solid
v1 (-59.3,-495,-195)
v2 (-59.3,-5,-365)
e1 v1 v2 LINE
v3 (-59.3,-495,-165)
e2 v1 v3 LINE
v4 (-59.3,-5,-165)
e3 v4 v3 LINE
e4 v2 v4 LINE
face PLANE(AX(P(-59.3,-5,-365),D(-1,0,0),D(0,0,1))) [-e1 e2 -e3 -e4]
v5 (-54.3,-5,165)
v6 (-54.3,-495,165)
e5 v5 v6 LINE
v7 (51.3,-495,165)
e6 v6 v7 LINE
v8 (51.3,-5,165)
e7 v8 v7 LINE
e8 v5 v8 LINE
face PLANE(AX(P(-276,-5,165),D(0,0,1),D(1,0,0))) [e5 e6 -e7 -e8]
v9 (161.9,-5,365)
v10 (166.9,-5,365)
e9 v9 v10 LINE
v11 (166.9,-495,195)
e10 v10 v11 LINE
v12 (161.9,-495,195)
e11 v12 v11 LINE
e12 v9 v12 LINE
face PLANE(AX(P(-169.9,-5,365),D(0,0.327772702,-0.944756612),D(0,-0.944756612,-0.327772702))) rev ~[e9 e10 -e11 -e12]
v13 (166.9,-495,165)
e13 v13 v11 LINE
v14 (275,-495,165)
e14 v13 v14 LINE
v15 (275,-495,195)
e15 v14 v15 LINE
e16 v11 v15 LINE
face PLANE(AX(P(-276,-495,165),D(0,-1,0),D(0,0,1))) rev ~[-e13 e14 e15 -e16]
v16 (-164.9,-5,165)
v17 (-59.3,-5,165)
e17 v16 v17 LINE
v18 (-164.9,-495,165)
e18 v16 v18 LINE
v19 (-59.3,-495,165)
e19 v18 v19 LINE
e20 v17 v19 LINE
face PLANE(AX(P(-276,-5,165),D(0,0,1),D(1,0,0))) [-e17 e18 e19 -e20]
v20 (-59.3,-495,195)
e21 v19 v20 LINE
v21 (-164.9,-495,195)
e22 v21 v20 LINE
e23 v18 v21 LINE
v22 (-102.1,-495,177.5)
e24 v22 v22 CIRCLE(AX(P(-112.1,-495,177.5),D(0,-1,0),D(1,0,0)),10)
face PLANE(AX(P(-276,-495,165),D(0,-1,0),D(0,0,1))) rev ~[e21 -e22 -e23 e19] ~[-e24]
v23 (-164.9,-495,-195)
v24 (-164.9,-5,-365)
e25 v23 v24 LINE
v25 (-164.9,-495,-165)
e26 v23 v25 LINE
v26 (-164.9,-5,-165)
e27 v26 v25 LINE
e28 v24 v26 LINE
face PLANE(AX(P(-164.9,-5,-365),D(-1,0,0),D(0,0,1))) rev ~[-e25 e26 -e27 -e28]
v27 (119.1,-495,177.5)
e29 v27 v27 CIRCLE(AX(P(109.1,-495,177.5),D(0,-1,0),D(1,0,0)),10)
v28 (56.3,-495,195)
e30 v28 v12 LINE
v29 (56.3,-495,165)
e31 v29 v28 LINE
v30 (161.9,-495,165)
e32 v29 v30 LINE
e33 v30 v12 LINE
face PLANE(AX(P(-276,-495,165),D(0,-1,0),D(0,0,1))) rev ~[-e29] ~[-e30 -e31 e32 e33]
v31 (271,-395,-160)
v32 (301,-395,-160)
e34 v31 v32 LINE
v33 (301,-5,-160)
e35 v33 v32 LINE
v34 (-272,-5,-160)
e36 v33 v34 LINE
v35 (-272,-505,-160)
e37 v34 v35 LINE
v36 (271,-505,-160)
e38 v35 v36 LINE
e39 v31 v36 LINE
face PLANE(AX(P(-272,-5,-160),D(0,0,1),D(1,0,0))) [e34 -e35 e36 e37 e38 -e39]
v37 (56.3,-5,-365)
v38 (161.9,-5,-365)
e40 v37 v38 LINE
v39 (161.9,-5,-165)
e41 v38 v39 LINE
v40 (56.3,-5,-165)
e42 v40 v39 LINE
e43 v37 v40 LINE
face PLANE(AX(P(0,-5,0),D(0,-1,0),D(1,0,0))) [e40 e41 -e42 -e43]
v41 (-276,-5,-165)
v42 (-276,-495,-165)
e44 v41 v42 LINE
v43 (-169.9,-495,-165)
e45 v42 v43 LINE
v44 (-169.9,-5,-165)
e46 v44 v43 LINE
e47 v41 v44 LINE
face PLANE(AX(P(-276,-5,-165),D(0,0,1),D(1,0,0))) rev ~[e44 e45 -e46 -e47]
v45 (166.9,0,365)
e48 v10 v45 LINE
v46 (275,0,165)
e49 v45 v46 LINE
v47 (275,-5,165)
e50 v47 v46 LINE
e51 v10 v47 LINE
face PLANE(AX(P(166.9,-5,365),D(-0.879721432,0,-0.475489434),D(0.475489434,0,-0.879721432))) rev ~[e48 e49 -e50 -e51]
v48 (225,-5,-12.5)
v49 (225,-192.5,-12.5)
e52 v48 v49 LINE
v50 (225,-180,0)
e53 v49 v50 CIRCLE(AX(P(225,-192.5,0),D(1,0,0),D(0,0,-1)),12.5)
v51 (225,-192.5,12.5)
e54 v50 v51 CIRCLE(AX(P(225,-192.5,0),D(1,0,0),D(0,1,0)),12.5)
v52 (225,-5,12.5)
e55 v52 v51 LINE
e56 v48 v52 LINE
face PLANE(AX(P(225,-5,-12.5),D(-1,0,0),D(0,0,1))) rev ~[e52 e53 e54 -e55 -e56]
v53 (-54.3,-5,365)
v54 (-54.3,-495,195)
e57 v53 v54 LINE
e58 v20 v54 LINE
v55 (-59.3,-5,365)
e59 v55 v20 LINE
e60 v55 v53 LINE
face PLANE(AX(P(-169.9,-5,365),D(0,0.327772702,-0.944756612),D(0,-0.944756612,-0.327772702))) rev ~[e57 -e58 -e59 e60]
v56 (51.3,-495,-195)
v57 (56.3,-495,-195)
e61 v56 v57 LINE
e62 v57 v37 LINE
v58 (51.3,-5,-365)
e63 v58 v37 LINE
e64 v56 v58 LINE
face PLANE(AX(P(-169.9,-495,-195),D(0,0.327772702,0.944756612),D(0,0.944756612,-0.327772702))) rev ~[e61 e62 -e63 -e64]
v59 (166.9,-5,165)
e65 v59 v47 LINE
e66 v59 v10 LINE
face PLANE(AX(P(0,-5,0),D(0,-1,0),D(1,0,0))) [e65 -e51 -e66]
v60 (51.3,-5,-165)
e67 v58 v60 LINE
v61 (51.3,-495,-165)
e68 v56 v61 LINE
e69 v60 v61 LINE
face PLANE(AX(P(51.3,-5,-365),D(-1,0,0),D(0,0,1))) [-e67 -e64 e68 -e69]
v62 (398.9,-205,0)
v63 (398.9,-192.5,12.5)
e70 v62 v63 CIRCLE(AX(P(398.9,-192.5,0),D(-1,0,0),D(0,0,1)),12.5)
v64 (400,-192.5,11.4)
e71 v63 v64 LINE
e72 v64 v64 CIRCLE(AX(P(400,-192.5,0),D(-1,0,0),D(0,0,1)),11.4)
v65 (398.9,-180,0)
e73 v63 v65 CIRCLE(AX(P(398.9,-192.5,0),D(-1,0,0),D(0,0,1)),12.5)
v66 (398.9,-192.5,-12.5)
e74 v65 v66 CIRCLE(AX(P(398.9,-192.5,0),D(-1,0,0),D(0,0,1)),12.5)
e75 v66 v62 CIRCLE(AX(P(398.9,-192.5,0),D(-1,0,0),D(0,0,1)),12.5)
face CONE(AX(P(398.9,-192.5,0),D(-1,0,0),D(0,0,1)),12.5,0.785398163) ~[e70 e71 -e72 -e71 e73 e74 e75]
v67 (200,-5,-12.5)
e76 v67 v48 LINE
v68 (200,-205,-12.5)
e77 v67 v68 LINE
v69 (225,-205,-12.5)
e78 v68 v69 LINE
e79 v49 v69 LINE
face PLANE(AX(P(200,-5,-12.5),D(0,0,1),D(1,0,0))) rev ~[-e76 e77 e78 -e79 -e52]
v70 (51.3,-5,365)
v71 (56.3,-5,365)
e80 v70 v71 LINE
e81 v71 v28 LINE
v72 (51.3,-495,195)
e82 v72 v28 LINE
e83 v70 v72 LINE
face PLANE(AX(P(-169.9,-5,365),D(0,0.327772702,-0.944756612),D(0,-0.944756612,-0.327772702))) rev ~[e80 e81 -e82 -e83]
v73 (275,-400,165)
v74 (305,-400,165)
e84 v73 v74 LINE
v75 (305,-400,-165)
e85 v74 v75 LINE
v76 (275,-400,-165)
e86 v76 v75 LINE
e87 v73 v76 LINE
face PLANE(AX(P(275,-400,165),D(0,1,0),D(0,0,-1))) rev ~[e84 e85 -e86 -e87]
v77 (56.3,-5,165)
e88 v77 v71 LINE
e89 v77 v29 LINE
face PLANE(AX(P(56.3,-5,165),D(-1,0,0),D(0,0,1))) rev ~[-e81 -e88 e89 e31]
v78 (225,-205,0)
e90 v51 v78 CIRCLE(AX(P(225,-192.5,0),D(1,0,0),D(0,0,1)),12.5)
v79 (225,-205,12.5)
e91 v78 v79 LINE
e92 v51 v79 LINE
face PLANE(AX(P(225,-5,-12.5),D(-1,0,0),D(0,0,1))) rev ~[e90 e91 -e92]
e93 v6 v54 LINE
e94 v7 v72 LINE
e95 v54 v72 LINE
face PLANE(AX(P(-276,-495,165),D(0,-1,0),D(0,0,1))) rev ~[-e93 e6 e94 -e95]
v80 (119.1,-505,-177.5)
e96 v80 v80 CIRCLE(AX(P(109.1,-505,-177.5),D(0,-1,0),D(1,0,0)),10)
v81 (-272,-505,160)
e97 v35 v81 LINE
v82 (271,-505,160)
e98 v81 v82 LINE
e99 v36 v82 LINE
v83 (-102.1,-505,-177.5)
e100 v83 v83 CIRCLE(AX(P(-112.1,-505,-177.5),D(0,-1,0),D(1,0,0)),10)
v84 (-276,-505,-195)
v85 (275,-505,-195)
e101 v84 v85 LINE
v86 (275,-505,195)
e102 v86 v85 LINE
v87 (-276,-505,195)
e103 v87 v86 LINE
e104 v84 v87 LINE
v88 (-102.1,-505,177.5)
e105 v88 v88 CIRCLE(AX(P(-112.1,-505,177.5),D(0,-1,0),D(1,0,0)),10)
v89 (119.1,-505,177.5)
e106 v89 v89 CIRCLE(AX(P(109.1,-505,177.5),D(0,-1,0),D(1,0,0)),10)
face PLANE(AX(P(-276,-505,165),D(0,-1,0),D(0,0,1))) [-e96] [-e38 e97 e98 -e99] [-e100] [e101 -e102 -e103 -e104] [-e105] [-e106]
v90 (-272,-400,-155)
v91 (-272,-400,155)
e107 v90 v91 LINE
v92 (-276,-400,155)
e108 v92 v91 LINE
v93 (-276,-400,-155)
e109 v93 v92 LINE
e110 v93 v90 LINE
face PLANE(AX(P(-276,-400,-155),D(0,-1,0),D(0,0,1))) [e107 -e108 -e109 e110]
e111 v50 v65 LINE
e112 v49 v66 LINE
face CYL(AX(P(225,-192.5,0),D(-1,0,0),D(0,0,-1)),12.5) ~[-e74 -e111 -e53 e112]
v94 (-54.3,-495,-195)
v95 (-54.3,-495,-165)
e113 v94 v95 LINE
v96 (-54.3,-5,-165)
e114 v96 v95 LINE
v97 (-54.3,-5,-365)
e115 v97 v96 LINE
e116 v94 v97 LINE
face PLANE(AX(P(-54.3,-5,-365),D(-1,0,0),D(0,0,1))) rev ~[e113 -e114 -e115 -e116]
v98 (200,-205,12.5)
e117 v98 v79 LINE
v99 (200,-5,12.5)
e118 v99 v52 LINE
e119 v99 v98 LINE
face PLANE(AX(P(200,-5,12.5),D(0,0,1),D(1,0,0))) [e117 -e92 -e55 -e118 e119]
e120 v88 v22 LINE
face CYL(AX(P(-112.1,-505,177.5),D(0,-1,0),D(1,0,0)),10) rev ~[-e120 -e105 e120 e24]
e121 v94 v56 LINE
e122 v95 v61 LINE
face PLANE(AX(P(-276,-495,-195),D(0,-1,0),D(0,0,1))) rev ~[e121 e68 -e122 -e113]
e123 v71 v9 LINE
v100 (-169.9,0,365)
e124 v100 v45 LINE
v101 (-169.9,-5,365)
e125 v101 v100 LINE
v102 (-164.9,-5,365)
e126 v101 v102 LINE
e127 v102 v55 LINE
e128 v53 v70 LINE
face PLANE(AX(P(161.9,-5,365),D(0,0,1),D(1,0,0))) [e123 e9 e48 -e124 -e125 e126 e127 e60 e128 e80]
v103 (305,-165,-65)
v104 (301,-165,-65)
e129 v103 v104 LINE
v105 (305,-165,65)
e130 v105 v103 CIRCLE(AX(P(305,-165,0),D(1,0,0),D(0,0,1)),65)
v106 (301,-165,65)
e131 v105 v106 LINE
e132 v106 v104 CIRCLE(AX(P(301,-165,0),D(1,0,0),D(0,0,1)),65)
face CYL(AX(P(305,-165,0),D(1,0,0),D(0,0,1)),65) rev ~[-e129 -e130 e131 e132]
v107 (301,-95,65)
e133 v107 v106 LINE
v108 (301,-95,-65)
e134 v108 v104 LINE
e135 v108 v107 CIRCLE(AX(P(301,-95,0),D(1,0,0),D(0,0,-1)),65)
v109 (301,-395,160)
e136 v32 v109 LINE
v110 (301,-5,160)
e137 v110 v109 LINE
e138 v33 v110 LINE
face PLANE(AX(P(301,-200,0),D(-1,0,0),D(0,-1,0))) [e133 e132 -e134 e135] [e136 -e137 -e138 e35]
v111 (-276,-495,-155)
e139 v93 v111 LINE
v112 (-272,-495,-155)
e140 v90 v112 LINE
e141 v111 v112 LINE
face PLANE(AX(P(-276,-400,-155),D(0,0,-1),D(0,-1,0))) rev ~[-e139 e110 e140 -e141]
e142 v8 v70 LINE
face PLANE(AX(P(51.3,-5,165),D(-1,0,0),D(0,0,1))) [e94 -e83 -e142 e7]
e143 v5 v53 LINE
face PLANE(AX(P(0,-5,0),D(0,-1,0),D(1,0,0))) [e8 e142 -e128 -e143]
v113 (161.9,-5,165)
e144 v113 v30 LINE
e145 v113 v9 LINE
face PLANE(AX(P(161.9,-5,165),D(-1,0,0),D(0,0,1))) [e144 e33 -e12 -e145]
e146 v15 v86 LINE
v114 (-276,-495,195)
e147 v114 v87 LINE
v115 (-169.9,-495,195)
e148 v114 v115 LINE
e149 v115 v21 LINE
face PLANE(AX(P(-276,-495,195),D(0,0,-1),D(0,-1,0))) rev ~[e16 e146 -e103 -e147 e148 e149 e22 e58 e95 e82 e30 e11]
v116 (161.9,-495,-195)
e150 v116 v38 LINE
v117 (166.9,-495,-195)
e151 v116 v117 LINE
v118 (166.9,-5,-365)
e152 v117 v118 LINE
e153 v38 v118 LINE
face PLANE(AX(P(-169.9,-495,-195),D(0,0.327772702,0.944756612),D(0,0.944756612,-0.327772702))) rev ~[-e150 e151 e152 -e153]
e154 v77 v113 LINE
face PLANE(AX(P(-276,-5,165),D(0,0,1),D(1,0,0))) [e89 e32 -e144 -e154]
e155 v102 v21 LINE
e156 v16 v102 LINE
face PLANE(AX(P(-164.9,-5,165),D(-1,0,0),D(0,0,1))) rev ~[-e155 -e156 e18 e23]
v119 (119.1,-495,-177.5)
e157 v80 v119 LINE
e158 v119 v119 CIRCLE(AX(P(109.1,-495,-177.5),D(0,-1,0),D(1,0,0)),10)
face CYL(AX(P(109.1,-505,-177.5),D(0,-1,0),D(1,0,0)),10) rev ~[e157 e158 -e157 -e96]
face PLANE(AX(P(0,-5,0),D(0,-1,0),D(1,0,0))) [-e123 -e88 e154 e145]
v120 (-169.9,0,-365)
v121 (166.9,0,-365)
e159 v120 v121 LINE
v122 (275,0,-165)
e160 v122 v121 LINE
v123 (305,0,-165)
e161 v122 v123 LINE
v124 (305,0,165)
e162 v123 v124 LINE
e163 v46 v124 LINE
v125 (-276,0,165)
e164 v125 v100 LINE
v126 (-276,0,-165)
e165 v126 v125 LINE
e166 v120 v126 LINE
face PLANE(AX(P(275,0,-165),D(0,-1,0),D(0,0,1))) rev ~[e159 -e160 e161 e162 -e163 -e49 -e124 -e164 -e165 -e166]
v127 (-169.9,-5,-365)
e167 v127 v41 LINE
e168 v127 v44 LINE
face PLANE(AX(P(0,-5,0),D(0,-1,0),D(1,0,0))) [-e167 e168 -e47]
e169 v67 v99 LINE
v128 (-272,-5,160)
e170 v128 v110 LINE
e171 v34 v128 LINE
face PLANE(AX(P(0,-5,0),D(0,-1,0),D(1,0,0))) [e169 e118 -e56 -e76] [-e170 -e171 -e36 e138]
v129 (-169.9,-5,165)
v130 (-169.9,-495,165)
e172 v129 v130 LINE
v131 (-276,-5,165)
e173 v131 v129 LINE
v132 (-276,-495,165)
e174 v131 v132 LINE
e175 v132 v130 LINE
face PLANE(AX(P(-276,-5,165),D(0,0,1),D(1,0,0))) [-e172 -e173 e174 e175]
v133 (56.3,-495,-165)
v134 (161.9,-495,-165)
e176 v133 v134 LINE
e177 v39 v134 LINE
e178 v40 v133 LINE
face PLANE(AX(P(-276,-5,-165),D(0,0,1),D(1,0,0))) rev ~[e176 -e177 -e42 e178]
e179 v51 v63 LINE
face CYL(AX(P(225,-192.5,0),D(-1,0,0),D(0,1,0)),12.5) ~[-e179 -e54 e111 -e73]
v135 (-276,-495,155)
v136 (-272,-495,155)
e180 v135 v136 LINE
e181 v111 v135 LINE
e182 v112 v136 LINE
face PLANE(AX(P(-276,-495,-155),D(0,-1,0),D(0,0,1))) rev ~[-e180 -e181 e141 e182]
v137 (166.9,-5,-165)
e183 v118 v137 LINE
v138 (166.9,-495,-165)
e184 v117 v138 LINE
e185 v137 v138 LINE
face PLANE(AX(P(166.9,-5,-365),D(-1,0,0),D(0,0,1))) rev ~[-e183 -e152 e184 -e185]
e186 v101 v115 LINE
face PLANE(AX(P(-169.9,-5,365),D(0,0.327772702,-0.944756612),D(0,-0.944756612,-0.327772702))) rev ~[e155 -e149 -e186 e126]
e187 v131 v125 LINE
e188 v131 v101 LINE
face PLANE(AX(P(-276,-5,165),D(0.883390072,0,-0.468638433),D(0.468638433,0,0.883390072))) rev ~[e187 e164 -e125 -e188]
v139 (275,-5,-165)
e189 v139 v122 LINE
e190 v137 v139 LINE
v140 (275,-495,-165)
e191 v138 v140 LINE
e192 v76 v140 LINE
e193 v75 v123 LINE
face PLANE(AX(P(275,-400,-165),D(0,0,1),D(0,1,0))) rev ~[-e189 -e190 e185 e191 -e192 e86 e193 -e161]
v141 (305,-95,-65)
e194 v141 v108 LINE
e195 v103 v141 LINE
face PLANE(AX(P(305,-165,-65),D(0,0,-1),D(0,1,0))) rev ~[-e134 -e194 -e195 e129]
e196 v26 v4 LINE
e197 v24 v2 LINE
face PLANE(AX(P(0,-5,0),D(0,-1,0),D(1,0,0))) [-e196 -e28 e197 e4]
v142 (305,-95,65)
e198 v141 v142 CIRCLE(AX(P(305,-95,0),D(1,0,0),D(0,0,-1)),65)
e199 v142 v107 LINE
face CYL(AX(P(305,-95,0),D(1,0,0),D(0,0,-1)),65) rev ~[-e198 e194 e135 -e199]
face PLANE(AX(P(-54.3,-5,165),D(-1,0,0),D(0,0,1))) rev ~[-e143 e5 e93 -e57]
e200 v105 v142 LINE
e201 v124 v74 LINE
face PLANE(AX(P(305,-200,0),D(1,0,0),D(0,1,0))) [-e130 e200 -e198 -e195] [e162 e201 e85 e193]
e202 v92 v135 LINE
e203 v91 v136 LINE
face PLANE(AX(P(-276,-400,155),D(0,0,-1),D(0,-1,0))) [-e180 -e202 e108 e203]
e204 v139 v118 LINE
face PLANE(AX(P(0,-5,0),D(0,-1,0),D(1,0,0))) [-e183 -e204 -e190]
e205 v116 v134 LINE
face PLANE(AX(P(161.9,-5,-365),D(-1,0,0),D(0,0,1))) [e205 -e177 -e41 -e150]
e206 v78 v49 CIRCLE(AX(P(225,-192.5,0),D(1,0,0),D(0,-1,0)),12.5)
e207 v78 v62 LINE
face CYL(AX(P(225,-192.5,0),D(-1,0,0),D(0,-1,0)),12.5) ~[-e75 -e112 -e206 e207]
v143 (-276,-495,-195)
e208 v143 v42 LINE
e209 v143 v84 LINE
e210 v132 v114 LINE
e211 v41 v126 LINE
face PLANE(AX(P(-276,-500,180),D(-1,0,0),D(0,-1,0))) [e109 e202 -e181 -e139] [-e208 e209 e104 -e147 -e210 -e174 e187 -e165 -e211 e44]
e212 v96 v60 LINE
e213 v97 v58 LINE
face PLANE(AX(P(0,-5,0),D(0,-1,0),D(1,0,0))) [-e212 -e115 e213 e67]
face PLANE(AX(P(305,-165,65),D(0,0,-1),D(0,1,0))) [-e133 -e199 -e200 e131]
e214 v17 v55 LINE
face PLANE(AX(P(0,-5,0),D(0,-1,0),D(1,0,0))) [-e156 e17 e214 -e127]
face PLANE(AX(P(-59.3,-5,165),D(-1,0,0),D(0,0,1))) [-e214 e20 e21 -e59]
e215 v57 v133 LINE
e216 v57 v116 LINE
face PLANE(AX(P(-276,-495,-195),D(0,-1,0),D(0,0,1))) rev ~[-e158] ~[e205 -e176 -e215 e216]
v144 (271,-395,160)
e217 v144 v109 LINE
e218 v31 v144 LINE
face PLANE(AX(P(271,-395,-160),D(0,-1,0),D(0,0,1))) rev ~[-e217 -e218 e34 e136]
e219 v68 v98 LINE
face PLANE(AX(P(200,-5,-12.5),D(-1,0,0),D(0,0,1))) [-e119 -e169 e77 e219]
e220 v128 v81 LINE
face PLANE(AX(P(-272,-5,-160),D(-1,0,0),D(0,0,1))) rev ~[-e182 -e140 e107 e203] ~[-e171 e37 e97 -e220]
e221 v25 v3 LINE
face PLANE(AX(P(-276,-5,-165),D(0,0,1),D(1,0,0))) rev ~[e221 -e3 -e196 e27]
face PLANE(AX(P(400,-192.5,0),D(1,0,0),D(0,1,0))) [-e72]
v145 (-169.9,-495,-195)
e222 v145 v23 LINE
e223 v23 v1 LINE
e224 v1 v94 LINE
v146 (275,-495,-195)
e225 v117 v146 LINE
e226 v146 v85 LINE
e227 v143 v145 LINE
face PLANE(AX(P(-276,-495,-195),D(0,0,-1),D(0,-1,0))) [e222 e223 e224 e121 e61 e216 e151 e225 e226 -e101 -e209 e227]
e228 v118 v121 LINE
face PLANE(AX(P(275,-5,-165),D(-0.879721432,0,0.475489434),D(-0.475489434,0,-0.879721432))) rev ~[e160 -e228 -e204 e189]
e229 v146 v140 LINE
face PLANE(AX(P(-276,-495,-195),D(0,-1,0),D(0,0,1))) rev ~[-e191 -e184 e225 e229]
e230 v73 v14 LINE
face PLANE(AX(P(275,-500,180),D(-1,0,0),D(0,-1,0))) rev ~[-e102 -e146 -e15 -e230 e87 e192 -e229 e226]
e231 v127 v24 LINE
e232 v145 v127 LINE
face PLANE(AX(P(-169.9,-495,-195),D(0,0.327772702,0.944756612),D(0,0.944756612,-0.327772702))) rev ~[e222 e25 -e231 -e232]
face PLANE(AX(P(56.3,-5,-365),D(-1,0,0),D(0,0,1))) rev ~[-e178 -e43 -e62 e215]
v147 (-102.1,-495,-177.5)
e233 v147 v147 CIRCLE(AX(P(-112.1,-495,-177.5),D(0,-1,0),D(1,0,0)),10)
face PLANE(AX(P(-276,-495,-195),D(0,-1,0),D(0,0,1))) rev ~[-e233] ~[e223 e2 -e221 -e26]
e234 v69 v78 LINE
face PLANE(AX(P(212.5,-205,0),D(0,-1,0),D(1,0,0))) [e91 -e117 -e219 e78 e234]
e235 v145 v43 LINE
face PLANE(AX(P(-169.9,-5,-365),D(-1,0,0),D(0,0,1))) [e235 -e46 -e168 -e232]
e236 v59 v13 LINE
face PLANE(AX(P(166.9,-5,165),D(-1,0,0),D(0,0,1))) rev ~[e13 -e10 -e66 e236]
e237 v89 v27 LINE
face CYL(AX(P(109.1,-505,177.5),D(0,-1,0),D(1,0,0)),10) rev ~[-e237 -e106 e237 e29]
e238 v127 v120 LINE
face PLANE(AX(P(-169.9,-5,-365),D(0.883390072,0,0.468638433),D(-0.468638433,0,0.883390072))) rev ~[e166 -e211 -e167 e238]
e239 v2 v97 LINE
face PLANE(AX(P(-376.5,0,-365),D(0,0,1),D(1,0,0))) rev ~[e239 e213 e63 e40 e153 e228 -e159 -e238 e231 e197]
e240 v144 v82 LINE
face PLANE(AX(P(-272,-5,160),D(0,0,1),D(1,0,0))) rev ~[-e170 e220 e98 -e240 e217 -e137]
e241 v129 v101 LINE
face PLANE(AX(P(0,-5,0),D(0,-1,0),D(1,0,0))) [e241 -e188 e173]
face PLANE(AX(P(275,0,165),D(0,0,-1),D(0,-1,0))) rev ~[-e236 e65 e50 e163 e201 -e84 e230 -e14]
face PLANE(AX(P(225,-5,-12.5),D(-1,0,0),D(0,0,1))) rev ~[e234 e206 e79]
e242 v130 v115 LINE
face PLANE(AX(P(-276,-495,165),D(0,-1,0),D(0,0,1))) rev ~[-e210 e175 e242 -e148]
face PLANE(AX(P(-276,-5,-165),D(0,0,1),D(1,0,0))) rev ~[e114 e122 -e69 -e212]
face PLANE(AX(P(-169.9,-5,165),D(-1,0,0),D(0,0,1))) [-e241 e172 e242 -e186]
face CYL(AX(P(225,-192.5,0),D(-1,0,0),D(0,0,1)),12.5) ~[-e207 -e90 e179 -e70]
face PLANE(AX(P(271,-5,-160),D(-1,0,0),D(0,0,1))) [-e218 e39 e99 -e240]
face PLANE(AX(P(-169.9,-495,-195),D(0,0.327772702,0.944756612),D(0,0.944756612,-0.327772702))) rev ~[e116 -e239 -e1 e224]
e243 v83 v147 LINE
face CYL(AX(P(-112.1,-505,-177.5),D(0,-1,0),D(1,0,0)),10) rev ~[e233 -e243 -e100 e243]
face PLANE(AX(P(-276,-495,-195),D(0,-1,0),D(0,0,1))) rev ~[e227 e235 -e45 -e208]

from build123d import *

# Parameters (mm, degrees)
F0_W      = 753
F0_H      = 730
F1_DEPTH  = 5
F2_W      = 551
F2_H      = 330
F2_W_2    = 543
F2_H_2    = 320
F3_DEPTH  = 500
F4_W      = 10
F4_H      = 30
F5_DEPTH  = 551
F6_W      = 5
F6_H      = 200
F7_DEPTH  = 490
F10_DEPTH = 546.401
F13_DEPTH = 5.001
F15_DEPTH = 30
F16_W     = 390
F16_H     = 320
F17_DEPTH = 30
F18_W     = 70
F18_H     = 130
F19_DEPTH = 5
F20_W     = 95
F20_H     = 310
F21_DEPTH = 5
F22_W     = 25
F22_H     = 25
F23_DEPTH = 200
F25_DEPTH = 175
F27_R     = 10
F28_DEPTH = 25


# Not quite as in the source:
# - a fillet or chamfer that OpenCascade refuses, or shapes differently, is made with other operations: its cross-section is extruded or revolved along the edge and cut away or added


with BuildPart() as f1:
    # F0 (on Front) → F1 (new body)
    with BuildSketch(Plane.XZ):
        Rectangle(F0_W, F0_H)
    extrude(amount=F1_DEPTH)

    # F2 (on face) → F3 (join)
    with BuildSketch(Plane.XZ.offset(5)):
        with Locations((-0.5, 0)):
            Rectangle(F2_W, F2_H)
        with Locations((-0.5, 0)):
            Rectangle(F2_W_2, F2_H_2, mode=Mode.SUBTRACT)
    extrude(amount=F3_DEPTH)

    # F4 (on face) → F5 (join, through all)
    with BuildSketch(Plane(origin=(-276, 0, 0), x_dir=(0, -1, 0), z_dir=(-1, 0, 0))):
        with Locations((500, 180)):
            Rectangle(F4_W, F4_H)
        with Locations((500, -180)):
            Rectangle(F4_W, F4_H)
    extrude(amount=-F5_DEPTH)

    # F6 (on face) → F7 (join, through all)
    with BuildSketch(Plane.XZ.offset(5)):
        with Locations((164.4, 265)):
            Rectangle(F6_W, F6_H)
        with Locations((53.8, 265)):
            Rectangle(F6_W, F6_H)
        with Locations((-56.8, 265)):
            Rectangle(F6_W, F6_H)
        with Locations((-167.4, 265)):
            Rectangle(F6_W, F6_H)
        with Locations((164.4, -265)):
            Rectangle(F6_W, F6_H)
        with Locations((53.8, -265)):
            Rectangle(F6_W, F6_H)
        with Locations((-56.8, -265)):
            Rectangle(F6_W, F6_H)
        with Locations((-167.4, -265)):
            Rectangle(F6_W, F6_H)
    extrude(amount=F7_DEPTH)

    # F8 (on face) + F9 (on face) → F10 (cut, through all)
    with BuildSketch(Plane(origin=(-169.9, 0, 0), x_dir=(0, -1, 0), z_dir=(-1, 0, 0))):
        Polygon((5, 365), (495, 195), (495, 365), align=None)
    with BuildSketch(Plane(origin=(-169.9, 0, 0), x_dir=(0, -1, 0), z_dir=(-1, 0, 0))):
        Polygon((495, -365), (495, -195), (5, -365), align=None)
    extrude(amount=-F10_DEPTH, mode=Mode.SUBTRACT)

    # F11 (on face) + F12 (on face) → F13 (cut, through all)
    with BuildSketch(Plane.XZ.offset(5)):
        Polygon((275, -165), (166.9, -365), (376.5, -365), (376.5, 365), (166.9, 365), (275, 165), align=None)
    with BuildSketch(Plane.XZ.offset(5)):
        Polygon((-376.5, -365), (-169.9, -365), (-276, -165), (-276, 165), (-169.9, 365), (-376.5, 365), align=None)
    extrude(amount=-F13_DEPTH, mode=Mode.SUBTRACT)

    # F14 (on face) → F15 (join)
    with BuildSketch(Plane.YZ.offset(275)):
        Polygon((-5, -165), (0, -165), (0, 165), (-5, 165), (-400, 165), (-400, -165), align=None)
    extrude(amount=F15_DEPTH)

    # F16 (on face) → F17 (cut)
    with BuildSketch(Plane(origin=(271, 0, 0), x_dir=(0, -1, 0), z_dir=(-1, 0, 0))):
        with Locations((200, 0)):
            Rectangle(F16_W, F16_H)
    extrude(amount=-F17_DEPTH, mode=Mode.SUBTRACT)

    # F18 (on face) → F19 (cut)
    with BuildSketch(Plane.YZ.offset(305)):
        with BuildLine():
            ThreePointArc((-165, 65), (-230, 0), (-165, -65))
            Line((-165, -65), (-165, 65))
        make_face()
        with Locations((-130, 0)):
            Rectangle(F18_W, F18_H)
        with BuildLine():
            Line((-95, 65), (-95, -65))
            ThreePointArc((-95, -65), (-30, 0), (-95, 65))
        make_face()
    extrude(amount=-F19_DEPTH, mode=Mode.SUBTRACT)

    # F20 (on face) → F21 (cut)
    with BuildSketch(Plane(origin=(-276, 0, 0), x_dir=(0, -1, 0), z_dir=(-1, 0, 0))):
        with Locations((447.5, 0)):
            Rectangle(F20_W, F20_H)
    extrude(amount=-F21_DEPTH, mode=Mode.SUBTRACT)

    # F22 (on face) → F23 (join)
    with BuildSketch(Plane.XZ.offset(5)):
        with Locations((212.5, 0)):
            Rectangle(F22_W, F22_H)
    extrude(amount=F23_DEPTH)

    # F24 (on face) → F25 (join)
    with BuildSketch(Plane.YZ.offset(225)):
        with BuildLine():
            ThreePointArc((-192.5, -12.5), (-183.6611652352, -8.8388347648), (-180, 0))
            ThreePointArc((-180, 0), (-183.6611652352, 8.8388347648), (-192.5, 12.5))
            ThreePointArc((-192.5, 12.5), (-201.3388347648, 8.8388347648), (-205, 0))
            ThreePointArc((-205, 0), (-201.3388347648, -8.8388347648), (-192.5, -12.5))
        make_face()
    extrude(amount=F25_DEPTH)

    # F26: chamfer of 1.1 on 1 edges, made by hand

    # F26_s1 → F26_t2 (revolve, cut)
    with BuildSketch(Plane.XZ.offset(192.5)):
        Polygon((398.9, 12.5), (400, 11.4), (400, 12.5), align=None)
    revolve(axis=Axis((400, -192.5, 0), (-1, 0, 0)), mode=Mode.SUBTRACT)

    # F27 (on face) → F28 (cut)
    with BuildSketch(Plane.XZ.offset(505)):
        with Locations((109.1, 177.5)):
            Circle(F27_R)
        with Locations((-112.1, 177.5)):
            Circle(F27_R)
        with Locations((-112.1, -177.5)):
            Circle(F27_R)
        with Locations((109.1, -177.5)):
            Circle(F27_R)
    extrude(amount=-F28_DEPTH, mode=Mode.SUBTRACT)


solid = f1.part
